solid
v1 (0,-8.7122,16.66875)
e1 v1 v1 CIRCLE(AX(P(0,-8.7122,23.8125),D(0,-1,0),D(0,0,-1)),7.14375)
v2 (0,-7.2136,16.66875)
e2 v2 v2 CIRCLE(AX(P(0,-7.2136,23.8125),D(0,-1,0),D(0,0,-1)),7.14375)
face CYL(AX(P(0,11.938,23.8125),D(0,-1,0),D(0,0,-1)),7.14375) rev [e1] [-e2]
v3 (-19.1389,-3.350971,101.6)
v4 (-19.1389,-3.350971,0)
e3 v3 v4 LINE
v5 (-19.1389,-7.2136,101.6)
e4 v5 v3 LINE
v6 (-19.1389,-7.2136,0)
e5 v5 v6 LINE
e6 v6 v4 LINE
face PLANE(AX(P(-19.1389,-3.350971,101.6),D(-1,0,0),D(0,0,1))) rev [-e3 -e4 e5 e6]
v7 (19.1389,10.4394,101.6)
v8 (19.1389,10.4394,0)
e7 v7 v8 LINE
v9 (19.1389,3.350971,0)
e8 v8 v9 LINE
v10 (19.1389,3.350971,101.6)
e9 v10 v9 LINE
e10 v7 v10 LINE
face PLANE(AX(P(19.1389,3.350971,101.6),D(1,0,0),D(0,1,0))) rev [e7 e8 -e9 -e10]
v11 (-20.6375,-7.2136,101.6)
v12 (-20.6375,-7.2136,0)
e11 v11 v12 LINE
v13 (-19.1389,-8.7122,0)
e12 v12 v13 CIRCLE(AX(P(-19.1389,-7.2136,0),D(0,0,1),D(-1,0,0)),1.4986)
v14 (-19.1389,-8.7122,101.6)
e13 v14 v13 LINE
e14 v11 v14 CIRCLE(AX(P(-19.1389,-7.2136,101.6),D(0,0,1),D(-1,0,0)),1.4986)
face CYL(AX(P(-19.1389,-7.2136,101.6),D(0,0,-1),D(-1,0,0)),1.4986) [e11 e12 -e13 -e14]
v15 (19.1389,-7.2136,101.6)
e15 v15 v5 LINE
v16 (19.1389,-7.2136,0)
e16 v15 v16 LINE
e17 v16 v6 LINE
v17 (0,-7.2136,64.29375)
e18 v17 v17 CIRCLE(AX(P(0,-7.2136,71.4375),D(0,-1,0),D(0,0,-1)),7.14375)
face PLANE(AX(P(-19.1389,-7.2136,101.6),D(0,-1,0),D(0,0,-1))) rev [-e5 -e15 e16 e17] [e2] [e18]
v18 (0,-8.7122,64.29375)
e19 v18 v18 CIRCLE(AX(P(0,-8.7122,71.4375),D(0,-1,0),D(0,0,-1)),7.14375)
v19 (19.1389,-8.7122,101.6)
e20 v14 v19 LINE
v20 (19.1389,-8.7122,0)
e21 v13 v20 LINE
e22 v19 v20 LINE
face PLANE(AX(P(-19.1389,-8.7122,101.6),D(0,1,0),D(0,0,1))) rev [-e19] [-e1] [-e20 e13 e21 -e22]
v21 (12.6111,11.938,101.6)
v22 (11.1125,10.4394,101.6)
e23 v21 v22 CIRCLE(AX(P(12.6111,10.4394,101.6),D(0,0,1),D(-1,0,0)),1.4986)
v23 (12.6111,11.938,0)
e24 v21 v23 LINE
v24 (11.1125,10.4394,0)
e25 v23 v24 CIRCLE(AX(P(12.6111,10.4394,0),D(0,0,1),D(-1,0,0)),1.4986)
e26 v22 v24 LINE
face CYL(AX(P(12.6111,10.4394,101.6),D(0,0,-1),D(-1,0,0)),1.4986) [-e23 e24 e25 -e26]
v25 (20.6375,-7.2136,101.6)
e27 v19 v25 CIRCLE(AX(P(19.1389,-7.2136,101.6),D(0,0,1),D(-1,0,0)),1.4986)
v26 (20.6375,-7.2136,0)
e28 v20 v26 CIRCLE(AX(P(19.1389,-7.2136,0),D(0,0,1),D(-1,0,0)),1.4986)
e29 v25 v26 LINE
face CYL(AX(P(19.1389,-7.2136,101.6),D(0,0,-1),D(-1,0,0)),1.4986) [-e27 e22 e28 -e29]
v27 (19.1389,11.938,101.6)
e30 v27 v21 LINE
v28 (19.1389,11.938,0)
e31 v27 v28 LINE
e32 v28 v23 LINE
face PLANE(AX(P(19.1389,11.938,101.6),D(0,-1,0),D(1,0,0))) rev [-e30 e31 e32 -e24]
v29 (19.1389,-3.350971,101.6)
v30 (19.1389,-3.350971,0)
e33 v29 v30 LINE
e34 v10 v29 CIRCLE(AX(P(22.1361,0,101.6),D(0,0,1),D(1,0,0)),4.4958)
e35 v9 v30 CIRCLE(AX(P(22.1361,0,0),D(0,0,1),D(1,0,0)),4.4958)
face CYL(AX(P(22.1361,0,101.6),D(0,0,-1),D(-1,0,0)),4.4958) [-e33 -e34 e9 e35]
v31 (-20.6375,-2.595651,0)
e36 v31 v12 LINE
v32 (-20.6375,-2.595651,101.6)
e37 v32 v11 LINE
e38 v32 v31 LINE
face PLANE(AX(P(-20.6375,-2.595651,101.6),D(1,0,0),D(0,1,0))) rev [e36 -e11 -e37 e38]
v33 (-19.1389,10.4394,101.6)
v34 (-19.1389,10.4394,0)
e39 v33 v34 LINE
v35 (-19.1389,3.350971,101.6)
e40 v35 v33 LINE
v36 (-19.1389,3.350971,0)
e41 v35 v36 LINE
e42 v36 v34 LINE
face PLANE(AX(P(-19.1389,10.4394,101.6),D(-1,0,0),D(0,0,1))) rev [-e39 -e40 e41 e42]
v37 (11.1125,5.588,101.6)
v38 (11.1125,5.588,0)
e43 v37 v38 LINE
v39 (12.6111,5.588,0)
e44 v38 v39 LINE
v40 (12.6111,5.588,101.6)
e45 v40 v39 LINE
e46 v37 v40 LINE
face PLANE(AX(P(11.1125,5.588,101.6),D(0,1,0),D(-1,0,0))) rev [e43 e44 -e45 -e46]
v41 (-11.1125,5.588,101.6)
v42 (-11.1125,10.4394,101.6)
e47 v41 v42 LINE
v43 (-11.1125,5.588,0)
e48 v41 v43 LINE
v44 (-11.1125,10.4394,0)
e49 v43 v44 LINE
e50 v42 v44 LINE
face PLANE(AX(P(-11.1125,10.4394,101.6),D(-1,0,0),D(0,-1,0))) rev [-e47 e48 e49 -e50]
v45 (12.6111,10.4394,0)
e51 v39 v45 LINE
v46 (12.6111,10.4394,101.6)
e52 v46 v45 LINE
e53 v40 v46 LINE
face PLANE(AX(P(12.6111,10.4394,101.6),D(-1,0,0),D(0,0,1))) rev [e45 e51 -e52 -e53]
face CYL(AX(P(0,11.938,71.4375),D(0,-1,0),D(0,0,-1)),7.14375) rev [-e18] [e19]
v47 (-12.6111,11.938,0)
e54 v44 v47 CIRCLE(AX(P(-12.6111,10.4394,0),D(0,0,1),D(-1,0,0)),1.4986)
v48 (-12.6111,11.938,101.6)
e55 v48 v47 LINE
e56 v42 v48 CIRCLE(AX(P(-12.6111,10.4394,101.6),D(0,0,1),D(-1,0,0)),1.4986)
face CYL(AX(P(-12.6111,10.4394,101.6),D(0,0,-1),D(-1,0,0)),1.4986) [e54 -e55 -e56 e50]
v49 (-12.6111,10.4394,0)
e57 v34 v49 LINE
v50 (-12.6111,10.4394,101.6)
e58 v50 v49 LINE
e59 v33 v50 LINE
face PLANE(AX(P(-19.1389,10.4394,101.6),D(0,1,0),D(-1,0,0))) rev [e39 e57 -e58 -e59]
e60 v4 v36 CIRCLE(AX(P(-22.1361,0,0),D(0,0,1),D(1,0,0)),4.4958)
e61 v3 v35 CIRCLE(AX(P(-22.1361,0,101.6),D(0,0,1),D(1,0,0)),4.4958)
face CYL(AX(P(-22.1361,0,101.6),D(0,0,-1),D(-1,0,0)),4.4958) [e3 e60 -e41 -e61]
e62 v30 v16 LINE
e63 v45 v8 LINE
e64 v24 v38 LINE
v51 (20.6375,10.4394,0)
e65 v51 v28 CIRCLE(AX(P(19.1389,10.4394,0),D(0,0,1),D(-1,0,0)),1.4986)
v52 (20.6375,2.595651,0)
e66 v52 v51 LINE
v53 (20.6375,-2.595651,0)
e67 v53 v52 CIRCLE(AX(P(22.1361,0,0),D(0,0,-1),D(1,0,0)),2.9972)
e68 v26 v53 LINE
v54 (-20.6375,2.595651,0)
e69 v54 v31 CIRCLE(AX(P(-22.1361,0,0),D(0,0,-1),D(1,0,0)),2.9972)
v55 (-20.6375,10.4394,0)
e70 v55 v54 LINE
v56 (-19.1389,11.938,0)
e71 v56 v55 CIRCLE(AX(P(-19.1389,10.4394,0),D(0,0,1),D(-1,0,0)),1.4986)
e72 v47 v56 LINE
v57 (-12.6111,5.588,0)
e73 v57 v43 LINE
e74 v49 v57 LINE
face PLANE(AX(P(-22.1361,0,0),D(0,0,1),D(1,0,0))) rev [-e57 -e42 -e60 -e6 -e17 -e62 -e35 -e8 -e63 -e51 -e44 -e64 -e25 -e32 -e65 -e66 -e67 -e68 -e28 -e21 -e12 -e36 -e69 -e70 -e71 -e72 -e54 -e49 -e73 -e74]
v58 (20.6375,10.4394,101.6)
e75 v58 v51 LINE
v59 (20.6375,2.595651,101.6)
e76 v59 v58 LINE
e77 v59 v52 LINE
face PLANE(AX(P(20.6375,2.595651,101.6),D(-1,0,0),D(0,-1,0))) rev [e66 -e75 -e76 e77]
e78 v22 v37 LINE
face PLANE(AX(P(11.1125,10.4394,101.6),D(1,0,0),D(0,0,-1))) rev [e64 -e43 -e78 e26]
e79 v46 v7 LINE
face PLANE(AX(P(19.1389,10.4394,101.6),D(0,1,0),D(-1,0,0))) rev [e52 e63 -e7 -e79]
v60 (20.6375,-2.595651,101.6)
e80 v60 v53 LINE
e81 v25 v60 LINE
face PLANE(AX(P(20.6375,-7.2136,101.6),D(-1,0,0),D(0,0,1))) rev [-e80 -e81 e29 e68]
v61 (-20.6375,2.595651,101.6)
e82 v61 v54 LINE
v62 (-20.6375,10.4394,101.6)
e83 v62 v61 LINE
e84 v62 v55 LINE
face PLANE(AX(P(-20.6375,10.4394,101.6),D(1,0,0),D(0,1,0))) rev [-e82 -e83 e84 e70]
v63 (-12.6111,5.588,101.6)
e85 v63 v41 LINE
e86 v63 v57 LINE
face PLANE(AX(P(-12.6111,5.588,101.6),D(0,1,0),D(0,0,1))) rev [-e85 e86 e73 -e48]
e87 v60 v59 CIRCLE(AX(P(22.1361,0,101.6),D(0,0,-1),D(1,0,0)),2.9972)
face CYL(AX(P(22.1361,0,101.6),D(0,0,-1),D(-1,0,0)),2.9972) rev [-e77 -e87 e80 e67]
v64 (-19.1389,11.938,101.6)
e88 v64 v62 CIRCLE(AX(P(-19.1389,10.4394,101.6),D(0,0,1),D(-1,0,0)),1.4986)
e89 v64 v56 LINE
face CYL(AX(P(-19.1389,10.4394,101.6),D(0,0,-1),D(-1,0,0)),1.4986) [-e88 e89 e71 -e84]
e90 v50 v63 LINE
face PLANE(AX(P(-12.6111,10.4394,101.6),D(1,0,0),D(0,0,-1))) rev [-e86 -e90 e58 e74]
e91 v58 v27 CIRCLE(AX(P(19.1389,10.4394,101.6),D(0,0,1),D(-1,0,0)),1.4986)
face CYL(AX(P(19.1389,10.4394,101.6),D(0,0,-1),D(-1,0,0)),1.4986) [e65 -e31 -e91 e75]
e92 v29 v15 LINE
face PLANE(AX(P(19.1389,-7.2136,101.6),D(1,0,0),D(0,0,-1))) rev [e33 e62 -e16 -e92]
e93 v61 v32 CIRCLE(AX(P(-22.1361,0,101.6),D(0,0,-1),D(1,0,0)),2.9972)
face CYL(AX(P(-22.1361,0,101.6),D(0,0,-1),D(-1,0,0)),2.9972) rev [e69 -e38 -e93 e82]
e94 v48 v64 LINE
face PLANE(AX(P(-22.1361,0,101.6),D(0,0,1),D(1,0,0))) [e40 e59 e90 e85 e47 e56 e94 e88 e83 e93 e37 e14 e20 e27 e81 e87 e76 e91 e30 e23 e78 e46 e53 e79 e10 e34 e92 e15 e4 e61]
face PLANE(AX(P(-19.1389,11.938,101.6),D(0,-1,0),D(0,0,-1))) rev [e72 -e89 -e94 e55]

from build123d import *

# Parameters (mm, degrees)
BASE_EXTRUDE_DEPTH = 101.6
HOLE1_START        = -8.7122
HOLE1_OUTLINE_R    = 7.14375
HOLE1_DEPTH        = 1.4986
LPATTERN2_COUNT    = 2
LPATTERN2_PITCH    = 47.625


# Read off the part's stored shape, not the designer's step: Hole1
with BuildPart() as part:
    # Sketch1 → Base-Extrude (new body)
    with BuildSketch(Plane.XY):
        with BuildLine():
            Line((-20.6375, 10.4394), (-20.6375, 2.59565134))
            ThreePointArc((-20.6375, 2.59565134), (-19.1389, 0), (-20.6375, -2.59565134))
            Line((-20.6375, -2.59565134), (-20.6375, -7.2136))
            ThreePointArc((-20.6375, -7.2136), (-20.198570222, -8.273270222), (-19.1389, -8.7122))
            Line((-19.1389, -8.7122), (19.1389, -8.7122))
            ThreePointArc((19.1389, -8.7122), (20.198570222, -8.273270222), (20.6375, -7.2136))
            Line((20.6375, -7.2136), (20.6375, -2.59565134))
            ThreePointArc((20.6375, -2.59565134), (19.1389, 0), (20.6375, 2.59565134))
            Line((20.6375, 2.59565134), (20.6375, 10.4394))
            ThreePointArc((20.6375, 10.4394), (20.198570222, 11.499070222), (19.1389, 11.938))
            Line((19.1389, 11.938), (12.6111, 11.938))
            ThreePointArc((12.6111, 11.938), (11.551429778, 11.499070222), (11.1125, 10.4394))
            Line((11.1125, 10.4394), (11.1125, 5.588))
            Line((11.1125, 5.588), (12.6111, 5.588))
            Line((12.6111, 5.588), (12.6111, 10.4394))
            Line((12.6111, 10.4394), (19.1389, 10.4394))
            Line((19.1389, 10.4394), (19.1389, 3.350971471))
            ThreePointArc((19.1389, 3.350971471), (17.6403, 0), (19.1389, -3.350971471))
            Line((19.1389, -3.350971471), (19.1389, -7.2136))
            Line((19.1389, -7.2136), (-19.1389, -7.2136))
            Line((-19.1389, -7.2136), (-19.1389, -3.350971471))
            ThreePointArc((-19.1389, -3.350971471), (-17.6403, 0), (-19.1389, 3.350971471))
            Line((-19.1389, 3.350971471), (-19.1389, 10.4394))
            Line((-19.1389, 10.4394), (-12.6111, 10.4394))
            Line((-12.6111, 10.4394), (-12.6111, 5.588))
            Line((-12.6111, 5.588), (-11.1125, 5.588))
            Line((-11.1125, 5.588), (-11.1125, 10.4394))
            ThreePointArc((-11.1125, 10.4394), (-11.551429778, 11.499070222), (-12.6111, 11.938))
            Line((-12.6111, 11.938), (-19.1389, 11.938))
            ThreePointArc((-19.1389, 11.938), (-20.198570222, 11.499070222), (-20.6375, 10.4394))
        make_face()
    extrude(amount=BASE_EXTRUDE_DEPTH)

    # Hole1 outline → Hole1 (cut)
    with BuildSketch(Plane(origin=(0, 0, 0), x_dir=(1, 0, 0), z_dir=(0, 1, 0)).offset(HOLE1_START)):
        with Locations((0, -23.8125)):
            Circle(HOLE1_OUTLINE_R)
    hole1 = extrude(amount=HOLE1_DEPTH, mode=Mode.SUBTRACT)

    # LPattern2: Hole1 ×2
    with Locations(*[(0, 0, i * LPATTERN2_PITCH) for i in range(1, LPATTERN2_COUNT)]):
        add(hole1, mode=Mode.SUBTRACT)


solid = part.part
